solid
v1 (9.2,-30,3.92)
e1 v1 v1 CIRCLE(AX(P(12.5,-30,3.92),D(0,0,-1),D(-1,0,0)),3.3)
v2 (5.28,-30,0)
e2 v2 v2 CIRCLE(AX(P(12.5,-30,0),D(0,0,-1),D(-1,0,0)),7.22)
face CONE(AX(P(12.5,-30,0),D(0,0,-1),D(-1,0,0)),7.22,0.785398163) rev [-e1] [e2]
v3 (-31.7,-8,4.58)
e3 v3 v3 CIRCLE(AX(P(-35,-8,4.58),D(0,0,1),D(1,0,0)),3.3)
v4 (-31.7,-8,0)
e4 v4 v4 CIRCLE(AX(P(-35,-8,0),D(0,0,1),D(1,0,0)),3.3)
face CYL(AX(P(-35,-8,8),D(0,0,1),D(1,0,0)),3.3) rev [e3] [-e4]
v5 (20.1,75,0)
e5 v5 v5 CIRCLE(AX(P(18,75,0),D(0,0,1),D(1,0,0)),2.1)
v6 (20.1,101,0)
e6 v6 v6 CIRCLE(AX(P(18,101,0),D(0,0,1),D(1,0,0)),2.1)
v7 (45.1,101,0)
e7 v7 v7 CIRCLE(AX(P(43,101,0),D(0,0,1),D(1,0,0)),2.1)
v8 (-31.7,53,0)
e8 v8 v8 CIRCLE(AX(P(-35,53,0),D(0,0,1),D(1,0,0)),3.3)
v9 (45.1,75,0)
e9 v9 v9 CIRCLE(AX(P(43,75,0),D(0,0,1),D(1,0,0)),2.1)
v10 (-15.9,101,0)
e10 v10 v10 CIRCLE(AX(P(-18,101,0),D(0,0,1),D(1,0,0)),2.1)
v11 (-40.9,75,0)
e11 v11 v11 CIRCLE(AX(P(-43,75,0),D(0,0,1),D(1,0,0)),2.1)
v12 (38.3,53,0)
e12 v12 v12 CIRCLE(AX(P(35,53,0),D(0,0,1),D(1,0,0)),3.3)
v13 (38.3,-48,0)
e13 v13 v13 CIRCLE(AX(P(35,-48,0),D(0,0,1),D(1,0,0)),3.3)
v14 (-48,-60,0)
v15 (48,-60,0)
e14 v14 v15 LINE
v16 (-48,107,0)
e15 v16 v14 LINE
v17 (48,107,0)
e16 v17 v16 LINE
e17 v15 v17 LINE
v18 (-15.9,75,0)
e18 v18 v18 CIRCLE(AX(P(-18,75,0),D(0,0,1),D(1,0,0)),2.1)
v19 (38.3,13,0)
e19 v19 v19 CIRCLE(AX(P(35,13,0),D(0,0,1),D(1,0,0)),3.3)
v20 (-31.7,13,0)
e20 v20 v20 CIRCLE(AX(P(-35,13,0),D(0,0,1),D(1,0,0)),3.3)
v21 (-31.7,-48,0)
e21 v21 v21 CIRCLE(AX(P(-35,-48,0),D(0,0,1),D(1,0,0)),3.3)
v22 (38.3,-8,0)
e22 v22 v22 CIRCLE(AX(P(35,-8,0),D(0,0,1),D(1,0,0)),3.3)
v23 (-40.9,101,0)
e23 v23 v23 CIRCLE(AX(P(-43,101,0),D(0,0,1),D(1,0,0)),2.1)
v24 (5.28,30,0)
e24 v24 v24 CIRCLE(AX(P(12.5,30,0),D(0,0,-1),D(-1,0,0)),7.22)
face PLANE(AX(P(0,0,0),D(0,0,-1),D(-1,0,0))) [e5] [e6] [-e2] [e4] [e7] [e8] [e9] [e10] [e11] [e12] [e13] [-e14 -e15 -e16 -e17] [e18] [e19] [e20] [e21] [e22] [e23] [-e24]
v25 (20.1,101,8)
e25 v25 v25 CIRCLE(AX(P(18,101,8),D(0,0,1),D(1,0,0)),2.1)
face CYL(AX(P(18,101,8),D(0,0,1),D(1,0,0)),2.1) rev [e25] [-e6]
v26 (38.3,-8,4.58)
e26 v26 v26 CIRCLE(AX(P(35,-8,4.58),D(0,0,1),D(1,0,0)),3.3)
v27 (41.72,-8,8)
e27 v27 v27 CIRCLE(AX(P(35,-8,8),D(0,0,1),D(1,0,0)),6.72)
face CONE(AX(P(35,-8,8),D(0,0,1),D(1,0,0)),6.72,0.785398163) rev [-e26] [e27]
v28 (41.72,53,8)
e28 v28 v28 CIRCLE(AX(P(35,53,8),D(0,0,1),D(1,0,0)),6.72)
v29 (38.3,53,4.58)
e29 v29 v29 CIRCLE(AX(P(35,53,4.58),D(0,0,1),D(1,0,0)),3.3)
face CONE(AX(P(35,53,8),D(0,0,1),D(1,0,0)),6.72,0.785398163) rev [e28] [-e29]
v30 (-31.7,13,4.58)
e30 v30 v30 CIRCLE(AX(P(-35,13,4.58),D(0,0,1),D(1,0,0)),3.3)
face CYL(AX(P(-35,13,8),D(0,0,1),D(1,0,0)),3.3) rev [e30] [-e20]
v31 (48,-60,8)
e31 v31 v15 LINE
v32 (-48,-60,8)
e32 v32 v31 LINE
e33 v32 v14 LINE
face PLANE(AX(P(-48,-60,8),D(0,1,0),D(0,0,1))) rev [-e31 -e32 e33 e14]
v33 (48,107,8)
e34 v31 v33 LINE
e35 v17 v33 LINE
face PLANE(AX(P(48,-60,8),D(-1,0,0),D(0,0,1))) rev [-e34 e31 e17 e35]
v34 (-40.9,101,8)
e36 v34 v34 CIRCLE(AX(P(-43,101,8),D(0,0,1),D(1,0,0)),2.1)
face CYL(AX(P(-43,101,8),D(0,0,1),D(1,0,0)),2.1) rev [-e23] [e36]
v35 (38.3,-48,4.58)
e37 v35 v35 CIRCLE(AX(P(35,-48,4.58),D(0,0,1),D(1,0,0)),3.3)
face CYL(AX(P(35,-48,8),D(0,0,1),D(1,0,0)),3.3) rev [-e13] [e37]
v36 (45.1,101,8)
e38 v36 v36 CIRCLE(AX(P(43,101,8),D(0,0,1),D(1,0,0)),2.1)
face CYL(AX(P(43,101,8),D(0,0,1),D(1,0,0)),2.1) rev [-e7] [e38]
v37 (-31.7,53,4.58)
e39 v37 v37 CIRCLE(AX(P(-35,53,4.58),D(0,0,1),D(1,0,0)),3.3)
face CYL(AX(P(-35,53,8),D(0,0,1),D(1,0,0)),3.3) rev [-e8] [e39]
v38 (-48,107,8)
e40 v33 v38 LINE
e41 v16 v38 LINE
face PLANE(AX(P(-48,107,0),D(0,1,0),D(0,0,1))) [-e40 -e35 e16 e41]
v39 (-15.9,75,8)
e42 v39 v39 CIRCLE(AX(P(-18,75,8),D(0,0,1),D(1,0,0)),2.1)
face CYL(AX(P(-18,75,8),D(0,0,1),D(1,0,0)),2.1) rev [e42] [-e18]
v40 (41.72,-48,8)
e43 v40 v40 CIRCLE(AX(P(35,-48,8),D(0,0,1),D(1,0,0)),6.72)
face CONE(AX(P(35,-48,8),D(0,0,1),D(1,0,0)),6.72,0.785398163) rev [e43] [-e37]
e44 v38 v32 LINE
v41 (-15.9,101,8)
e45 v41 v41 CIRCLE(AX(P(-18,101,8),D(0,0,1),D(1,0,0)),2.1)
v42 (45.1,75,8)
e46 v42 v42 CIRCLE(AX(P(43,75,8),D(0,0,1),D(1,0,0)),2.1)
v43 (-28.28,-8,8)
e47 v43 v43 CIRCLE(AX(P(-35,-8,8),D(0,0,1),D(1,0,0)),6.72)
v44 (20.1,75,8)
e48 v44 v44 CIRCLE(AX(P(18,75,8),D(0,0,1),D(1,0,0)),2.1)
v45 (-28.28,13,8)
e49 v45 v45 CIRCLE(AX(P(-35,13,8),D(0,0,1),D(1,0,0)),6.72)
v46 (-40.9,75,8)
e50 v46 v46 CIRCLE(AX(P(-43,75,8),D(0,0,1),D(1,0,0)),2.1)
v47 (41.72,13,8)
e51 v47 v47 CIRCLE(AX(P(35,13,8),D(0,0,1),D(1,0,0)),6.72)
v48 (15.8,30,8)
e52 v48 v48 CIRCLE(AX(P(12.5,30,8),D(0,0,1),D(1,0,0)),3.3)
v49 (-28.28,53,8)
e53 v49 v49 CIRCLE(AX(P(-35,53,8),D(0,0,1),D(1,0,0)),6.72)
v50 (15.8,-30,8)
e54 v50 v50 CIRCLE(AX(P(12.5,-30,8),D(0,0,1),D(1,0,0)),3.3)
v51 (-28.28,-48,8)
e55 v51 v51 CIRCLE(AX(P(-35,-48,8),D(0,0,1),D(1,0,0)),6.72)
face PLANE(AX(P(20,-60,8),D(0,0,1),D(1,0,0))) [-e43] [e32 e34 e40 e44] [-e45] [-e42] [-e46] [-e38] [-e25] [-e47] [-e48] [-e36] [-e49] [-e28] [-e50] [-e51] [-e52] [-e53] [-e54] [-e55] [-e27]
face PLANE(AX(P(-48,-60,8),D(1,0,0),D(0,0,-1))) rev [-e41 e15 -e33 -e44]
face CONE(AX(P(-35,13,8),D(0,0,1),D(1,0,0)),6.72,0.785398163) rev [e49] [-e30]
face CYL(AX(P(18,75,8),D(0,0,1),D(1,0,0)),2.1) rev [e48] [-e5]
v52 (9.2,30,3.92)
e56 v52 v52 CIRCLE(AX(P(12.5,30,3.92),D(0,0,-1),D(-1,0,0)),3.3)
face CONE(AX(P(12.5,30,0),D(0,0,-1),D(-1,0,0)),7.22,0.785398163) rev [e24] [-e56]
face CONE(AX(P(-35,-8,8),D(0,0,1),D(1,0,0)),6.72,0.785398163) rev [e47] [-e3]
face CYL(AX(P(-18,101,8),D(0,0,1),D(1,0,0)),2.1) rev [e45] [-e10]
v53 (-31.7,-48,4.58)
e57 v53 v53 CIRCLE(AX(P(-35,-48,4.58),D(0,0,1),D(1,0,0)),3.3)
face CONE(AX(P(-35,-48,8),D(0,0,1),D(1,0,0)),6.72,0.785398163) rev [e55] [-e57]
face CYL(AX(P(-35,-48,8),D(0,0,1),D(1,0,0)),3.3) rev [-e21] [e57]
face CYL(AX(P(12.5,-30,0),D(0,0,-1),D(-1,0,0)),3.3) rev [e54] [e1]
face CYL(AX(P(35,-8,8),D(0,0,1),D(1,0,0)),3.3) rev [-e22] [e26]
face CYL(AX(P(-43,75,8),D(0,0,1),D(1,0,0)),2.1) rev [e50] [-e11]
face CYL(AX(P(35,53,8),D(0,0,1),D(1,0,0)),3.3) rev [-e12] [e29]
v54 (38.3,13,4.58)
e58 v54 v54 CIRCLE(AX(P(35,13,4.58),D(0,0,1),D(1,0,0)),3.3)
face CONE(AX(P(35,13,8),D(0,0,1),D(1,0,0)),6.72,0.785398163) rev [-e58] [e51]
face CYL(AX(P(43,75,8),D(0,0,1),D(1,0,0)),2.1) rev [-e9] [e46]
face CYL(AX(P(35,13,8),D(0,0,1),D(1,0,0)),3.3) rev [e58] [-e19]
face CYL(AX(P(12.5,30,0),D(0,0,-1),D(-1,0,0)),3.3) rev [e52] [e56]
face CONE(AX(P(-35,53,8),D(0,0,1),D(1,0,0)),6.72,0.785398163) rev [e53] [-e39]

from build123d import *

# Parameters (mm, degrees)
SKETCH1_W                                            = 96
SKETCH1_H                                            = 120
BOSS_EXTRUDE1_DEPTH                                  = 8
CSK_FOR_M6_HEX_SOCKET_COUNTERSUNK_CAP_SC_D           = 6.6
CSK_FOR_M6_HEX_SOCKET_COUNTERSUNK_CAP_SC_CSINK_D     = 13.44
CSK_FOR_M6_HEX_SOCKET_COUNTERSUNK_CAP_SC_CSINK_ANGLE = 90
SKETCH4_W                                            = 15
SKETCH4_H                                            = 120
BOSS_EXTRUDE2_DEPTH                                  = 25
M6_TAPPED_HOLE1_D                                    = 5
SKETCH8_W                                            = 96
SKETCH8_H                                            = 47
BOSS_EXTRUDE4_DEPTH                                  = 8
M5_TAPPED_HOLE1_D                                    = 4.2
CSK_FOR_M6_HEX_SOCKET_COUNTERSUNK_CA_2_A_COUNT       = 2
CSK_FOR_M6_HEX_SOCKET_COUNTERSUNK_CA_2_A_PITCH       = 60
SKETCH16_W                                           = 2.5
SKETCH16_H                                           = 25
M6_TAPPED_HOLE2_AT_2_COUNT                           = 2
M6_TAPPED_HOLE2_AT_2_PITCH                           = 60


# Read off the part's stored shape, not the designer's step: Split1
with BuildPart() as part:
    # Sketch1 → Boss-Extrude1 (new body)
    with BuildSketch(Plane.XY):
        Rectangle(SKETCH1_W, SKETCH1_H)
    extrude(amount=BOSS_EXTRUDE1_DEPTH)

    # CSK for M6 Hex Socket Countersunk Cap Sc (through all)
    with Locations(Plane.XY.offset(8)):
        with Locations((-35, 53), (-35, 13), (-35, -8), (-35, -48)):
            csk_for_m6_hex_socket_countersunk_cap_sc = CounterSinkHole(CSK_FOR_M6_HEX_SOCKET_COUNTERSUNK_CAP_SC_D / 2, CSK_FOR_M6_HEX_SOCKET_COUNTERSUNK_CAP_SC_CSINK_D / 2, counter_sink_angle=CSK_FOR_M6_HEX_SOCKET_COUNTERSUNK_CAP_SC_CSINK_ANGLE)

    # Sketch4 → Boss-Extrude2 (add)
    with BuildSketch(Plane.XY.offset(8)):
        with Locations((12.5, 0)):
            Rectangle(SKETCH4_W, SKETCH4_H)
    extrude(amount=BOSS_EXTRUDE2_DEPTH)

    # M6 Tapped Hole1 (through all)
    with Locations(Plane.ZY.offset(-5)):
        with Locations((20.5, -40), (20.5, 40)):
            Hole(M6_TAPPED_HOLE1_D / 2)

    # Sketch8 → Boss-Extrude4 (add)
    with BuildSketch(Plane.XY.offset(8)):
        with Locations((0, 83.5)):
            Rectangle(SKETCH8_W, SKETCH8_H)
    extrude(amount=-BOSS_EXTRUDE4_DEPTH)

    # M5 Tapped Hole1 (through all)
    with Locations(Plane.XY.offset(8)):
        with Locations((-43, 101), (-43, 75), (-18, 101), (-18, 75), (18, 75), (18, 101), (43, 101), (43, 75)):
            Hole(M5_TAPPED_HOLE1_D / 2)

    # Mirror1: CSK for M6 Hex Socket Countersunk Cap Sc across plane
    add(csk_for_m6_hex_socket_countersunk_cap_sc.mirror(Plane(origin=(0, 0, 0), x_dir=(0, 0, 1), z_dir=(1, 0, 0))), mode=Mode.SUBTRACT)


with BuildPart() as body_2:
    # Split1: the piece on the far side of the plane
    add(part.part)
    split(bisect_by=Plane.XY.offset(8), keep=Keep.BOTTOM)

    # Sketch14 → CSK for M6 Hex Socket Countersunk Ca 2 (revolve, cut)
    with BuildSketch(Plane(origin=(12.5, 30, 0), x_dir=(0, 1, 0), z_dir=(1, 0, 0))):
        Polygon((0, 0), (0, 33), (3.3, 33), (3.3, 3.92), (7.22, 0), align=None)
    csk_for_m6_hex_socket_countersunk_ca_2 = revolve(axis=Axis((12.5, 30, -6.35), (0, 0, 1)), mode=Mode.SUBTRACT)

    # CSK for M6 Hex Socket Countersunk Ca 2 a: CSK for M6 Hex Socket Countersunk Ca 2 ×2
    with Locations(*[(0, -i * CSK_FOR_M6_HEX_SOCKET_COUNTERSUNK_CA_2_A_PITCH, 0) for i in range(1, CSK_FOR_M6_HEX_SOCKET_COUNTERSUNK_CA_2_A_COUNT)]):
        add(csk_for_m6_hex_socket_countersunk_ca_2, mode=Mode.SUBTRACT)


with BuildPart() as part_1:
    add(part.part)

    # Split1
    split(bisect_by=Plane.XY.offset(8), keep=Keep.TOP)

    # Sketch16 → M6 Tapped Hole2 (revolve, cut)
    with BuildSketch(Plane(origin=(12.5, 30, 8), x_dir=(0, 1, 0), z_dir=(1, 0, 0))):
        with Locations((1.25, 12.5)):
            Rectangle(SKETCH16_W, SKETCH16_H)
    m6_tapped_hole2 = revolve(axis=Axis((12.5, 30, 1.65), (0, 0, 1)), mode=Mode.SUBTRACT)

    # M6 Tapped Hole2 at 2: M6 Tapped Hole2 ×2
    with Locations(*[(0, -i * M6_TAPPED_HOLE2_AT_2_PITCH, 0) for i in range(1, M6_TAPPED_HOLE2_AT_2_COUNT)]):
        add(m6_tapped_hole2, mode=Mode.SUBTRACT)


solid = body_2.part
